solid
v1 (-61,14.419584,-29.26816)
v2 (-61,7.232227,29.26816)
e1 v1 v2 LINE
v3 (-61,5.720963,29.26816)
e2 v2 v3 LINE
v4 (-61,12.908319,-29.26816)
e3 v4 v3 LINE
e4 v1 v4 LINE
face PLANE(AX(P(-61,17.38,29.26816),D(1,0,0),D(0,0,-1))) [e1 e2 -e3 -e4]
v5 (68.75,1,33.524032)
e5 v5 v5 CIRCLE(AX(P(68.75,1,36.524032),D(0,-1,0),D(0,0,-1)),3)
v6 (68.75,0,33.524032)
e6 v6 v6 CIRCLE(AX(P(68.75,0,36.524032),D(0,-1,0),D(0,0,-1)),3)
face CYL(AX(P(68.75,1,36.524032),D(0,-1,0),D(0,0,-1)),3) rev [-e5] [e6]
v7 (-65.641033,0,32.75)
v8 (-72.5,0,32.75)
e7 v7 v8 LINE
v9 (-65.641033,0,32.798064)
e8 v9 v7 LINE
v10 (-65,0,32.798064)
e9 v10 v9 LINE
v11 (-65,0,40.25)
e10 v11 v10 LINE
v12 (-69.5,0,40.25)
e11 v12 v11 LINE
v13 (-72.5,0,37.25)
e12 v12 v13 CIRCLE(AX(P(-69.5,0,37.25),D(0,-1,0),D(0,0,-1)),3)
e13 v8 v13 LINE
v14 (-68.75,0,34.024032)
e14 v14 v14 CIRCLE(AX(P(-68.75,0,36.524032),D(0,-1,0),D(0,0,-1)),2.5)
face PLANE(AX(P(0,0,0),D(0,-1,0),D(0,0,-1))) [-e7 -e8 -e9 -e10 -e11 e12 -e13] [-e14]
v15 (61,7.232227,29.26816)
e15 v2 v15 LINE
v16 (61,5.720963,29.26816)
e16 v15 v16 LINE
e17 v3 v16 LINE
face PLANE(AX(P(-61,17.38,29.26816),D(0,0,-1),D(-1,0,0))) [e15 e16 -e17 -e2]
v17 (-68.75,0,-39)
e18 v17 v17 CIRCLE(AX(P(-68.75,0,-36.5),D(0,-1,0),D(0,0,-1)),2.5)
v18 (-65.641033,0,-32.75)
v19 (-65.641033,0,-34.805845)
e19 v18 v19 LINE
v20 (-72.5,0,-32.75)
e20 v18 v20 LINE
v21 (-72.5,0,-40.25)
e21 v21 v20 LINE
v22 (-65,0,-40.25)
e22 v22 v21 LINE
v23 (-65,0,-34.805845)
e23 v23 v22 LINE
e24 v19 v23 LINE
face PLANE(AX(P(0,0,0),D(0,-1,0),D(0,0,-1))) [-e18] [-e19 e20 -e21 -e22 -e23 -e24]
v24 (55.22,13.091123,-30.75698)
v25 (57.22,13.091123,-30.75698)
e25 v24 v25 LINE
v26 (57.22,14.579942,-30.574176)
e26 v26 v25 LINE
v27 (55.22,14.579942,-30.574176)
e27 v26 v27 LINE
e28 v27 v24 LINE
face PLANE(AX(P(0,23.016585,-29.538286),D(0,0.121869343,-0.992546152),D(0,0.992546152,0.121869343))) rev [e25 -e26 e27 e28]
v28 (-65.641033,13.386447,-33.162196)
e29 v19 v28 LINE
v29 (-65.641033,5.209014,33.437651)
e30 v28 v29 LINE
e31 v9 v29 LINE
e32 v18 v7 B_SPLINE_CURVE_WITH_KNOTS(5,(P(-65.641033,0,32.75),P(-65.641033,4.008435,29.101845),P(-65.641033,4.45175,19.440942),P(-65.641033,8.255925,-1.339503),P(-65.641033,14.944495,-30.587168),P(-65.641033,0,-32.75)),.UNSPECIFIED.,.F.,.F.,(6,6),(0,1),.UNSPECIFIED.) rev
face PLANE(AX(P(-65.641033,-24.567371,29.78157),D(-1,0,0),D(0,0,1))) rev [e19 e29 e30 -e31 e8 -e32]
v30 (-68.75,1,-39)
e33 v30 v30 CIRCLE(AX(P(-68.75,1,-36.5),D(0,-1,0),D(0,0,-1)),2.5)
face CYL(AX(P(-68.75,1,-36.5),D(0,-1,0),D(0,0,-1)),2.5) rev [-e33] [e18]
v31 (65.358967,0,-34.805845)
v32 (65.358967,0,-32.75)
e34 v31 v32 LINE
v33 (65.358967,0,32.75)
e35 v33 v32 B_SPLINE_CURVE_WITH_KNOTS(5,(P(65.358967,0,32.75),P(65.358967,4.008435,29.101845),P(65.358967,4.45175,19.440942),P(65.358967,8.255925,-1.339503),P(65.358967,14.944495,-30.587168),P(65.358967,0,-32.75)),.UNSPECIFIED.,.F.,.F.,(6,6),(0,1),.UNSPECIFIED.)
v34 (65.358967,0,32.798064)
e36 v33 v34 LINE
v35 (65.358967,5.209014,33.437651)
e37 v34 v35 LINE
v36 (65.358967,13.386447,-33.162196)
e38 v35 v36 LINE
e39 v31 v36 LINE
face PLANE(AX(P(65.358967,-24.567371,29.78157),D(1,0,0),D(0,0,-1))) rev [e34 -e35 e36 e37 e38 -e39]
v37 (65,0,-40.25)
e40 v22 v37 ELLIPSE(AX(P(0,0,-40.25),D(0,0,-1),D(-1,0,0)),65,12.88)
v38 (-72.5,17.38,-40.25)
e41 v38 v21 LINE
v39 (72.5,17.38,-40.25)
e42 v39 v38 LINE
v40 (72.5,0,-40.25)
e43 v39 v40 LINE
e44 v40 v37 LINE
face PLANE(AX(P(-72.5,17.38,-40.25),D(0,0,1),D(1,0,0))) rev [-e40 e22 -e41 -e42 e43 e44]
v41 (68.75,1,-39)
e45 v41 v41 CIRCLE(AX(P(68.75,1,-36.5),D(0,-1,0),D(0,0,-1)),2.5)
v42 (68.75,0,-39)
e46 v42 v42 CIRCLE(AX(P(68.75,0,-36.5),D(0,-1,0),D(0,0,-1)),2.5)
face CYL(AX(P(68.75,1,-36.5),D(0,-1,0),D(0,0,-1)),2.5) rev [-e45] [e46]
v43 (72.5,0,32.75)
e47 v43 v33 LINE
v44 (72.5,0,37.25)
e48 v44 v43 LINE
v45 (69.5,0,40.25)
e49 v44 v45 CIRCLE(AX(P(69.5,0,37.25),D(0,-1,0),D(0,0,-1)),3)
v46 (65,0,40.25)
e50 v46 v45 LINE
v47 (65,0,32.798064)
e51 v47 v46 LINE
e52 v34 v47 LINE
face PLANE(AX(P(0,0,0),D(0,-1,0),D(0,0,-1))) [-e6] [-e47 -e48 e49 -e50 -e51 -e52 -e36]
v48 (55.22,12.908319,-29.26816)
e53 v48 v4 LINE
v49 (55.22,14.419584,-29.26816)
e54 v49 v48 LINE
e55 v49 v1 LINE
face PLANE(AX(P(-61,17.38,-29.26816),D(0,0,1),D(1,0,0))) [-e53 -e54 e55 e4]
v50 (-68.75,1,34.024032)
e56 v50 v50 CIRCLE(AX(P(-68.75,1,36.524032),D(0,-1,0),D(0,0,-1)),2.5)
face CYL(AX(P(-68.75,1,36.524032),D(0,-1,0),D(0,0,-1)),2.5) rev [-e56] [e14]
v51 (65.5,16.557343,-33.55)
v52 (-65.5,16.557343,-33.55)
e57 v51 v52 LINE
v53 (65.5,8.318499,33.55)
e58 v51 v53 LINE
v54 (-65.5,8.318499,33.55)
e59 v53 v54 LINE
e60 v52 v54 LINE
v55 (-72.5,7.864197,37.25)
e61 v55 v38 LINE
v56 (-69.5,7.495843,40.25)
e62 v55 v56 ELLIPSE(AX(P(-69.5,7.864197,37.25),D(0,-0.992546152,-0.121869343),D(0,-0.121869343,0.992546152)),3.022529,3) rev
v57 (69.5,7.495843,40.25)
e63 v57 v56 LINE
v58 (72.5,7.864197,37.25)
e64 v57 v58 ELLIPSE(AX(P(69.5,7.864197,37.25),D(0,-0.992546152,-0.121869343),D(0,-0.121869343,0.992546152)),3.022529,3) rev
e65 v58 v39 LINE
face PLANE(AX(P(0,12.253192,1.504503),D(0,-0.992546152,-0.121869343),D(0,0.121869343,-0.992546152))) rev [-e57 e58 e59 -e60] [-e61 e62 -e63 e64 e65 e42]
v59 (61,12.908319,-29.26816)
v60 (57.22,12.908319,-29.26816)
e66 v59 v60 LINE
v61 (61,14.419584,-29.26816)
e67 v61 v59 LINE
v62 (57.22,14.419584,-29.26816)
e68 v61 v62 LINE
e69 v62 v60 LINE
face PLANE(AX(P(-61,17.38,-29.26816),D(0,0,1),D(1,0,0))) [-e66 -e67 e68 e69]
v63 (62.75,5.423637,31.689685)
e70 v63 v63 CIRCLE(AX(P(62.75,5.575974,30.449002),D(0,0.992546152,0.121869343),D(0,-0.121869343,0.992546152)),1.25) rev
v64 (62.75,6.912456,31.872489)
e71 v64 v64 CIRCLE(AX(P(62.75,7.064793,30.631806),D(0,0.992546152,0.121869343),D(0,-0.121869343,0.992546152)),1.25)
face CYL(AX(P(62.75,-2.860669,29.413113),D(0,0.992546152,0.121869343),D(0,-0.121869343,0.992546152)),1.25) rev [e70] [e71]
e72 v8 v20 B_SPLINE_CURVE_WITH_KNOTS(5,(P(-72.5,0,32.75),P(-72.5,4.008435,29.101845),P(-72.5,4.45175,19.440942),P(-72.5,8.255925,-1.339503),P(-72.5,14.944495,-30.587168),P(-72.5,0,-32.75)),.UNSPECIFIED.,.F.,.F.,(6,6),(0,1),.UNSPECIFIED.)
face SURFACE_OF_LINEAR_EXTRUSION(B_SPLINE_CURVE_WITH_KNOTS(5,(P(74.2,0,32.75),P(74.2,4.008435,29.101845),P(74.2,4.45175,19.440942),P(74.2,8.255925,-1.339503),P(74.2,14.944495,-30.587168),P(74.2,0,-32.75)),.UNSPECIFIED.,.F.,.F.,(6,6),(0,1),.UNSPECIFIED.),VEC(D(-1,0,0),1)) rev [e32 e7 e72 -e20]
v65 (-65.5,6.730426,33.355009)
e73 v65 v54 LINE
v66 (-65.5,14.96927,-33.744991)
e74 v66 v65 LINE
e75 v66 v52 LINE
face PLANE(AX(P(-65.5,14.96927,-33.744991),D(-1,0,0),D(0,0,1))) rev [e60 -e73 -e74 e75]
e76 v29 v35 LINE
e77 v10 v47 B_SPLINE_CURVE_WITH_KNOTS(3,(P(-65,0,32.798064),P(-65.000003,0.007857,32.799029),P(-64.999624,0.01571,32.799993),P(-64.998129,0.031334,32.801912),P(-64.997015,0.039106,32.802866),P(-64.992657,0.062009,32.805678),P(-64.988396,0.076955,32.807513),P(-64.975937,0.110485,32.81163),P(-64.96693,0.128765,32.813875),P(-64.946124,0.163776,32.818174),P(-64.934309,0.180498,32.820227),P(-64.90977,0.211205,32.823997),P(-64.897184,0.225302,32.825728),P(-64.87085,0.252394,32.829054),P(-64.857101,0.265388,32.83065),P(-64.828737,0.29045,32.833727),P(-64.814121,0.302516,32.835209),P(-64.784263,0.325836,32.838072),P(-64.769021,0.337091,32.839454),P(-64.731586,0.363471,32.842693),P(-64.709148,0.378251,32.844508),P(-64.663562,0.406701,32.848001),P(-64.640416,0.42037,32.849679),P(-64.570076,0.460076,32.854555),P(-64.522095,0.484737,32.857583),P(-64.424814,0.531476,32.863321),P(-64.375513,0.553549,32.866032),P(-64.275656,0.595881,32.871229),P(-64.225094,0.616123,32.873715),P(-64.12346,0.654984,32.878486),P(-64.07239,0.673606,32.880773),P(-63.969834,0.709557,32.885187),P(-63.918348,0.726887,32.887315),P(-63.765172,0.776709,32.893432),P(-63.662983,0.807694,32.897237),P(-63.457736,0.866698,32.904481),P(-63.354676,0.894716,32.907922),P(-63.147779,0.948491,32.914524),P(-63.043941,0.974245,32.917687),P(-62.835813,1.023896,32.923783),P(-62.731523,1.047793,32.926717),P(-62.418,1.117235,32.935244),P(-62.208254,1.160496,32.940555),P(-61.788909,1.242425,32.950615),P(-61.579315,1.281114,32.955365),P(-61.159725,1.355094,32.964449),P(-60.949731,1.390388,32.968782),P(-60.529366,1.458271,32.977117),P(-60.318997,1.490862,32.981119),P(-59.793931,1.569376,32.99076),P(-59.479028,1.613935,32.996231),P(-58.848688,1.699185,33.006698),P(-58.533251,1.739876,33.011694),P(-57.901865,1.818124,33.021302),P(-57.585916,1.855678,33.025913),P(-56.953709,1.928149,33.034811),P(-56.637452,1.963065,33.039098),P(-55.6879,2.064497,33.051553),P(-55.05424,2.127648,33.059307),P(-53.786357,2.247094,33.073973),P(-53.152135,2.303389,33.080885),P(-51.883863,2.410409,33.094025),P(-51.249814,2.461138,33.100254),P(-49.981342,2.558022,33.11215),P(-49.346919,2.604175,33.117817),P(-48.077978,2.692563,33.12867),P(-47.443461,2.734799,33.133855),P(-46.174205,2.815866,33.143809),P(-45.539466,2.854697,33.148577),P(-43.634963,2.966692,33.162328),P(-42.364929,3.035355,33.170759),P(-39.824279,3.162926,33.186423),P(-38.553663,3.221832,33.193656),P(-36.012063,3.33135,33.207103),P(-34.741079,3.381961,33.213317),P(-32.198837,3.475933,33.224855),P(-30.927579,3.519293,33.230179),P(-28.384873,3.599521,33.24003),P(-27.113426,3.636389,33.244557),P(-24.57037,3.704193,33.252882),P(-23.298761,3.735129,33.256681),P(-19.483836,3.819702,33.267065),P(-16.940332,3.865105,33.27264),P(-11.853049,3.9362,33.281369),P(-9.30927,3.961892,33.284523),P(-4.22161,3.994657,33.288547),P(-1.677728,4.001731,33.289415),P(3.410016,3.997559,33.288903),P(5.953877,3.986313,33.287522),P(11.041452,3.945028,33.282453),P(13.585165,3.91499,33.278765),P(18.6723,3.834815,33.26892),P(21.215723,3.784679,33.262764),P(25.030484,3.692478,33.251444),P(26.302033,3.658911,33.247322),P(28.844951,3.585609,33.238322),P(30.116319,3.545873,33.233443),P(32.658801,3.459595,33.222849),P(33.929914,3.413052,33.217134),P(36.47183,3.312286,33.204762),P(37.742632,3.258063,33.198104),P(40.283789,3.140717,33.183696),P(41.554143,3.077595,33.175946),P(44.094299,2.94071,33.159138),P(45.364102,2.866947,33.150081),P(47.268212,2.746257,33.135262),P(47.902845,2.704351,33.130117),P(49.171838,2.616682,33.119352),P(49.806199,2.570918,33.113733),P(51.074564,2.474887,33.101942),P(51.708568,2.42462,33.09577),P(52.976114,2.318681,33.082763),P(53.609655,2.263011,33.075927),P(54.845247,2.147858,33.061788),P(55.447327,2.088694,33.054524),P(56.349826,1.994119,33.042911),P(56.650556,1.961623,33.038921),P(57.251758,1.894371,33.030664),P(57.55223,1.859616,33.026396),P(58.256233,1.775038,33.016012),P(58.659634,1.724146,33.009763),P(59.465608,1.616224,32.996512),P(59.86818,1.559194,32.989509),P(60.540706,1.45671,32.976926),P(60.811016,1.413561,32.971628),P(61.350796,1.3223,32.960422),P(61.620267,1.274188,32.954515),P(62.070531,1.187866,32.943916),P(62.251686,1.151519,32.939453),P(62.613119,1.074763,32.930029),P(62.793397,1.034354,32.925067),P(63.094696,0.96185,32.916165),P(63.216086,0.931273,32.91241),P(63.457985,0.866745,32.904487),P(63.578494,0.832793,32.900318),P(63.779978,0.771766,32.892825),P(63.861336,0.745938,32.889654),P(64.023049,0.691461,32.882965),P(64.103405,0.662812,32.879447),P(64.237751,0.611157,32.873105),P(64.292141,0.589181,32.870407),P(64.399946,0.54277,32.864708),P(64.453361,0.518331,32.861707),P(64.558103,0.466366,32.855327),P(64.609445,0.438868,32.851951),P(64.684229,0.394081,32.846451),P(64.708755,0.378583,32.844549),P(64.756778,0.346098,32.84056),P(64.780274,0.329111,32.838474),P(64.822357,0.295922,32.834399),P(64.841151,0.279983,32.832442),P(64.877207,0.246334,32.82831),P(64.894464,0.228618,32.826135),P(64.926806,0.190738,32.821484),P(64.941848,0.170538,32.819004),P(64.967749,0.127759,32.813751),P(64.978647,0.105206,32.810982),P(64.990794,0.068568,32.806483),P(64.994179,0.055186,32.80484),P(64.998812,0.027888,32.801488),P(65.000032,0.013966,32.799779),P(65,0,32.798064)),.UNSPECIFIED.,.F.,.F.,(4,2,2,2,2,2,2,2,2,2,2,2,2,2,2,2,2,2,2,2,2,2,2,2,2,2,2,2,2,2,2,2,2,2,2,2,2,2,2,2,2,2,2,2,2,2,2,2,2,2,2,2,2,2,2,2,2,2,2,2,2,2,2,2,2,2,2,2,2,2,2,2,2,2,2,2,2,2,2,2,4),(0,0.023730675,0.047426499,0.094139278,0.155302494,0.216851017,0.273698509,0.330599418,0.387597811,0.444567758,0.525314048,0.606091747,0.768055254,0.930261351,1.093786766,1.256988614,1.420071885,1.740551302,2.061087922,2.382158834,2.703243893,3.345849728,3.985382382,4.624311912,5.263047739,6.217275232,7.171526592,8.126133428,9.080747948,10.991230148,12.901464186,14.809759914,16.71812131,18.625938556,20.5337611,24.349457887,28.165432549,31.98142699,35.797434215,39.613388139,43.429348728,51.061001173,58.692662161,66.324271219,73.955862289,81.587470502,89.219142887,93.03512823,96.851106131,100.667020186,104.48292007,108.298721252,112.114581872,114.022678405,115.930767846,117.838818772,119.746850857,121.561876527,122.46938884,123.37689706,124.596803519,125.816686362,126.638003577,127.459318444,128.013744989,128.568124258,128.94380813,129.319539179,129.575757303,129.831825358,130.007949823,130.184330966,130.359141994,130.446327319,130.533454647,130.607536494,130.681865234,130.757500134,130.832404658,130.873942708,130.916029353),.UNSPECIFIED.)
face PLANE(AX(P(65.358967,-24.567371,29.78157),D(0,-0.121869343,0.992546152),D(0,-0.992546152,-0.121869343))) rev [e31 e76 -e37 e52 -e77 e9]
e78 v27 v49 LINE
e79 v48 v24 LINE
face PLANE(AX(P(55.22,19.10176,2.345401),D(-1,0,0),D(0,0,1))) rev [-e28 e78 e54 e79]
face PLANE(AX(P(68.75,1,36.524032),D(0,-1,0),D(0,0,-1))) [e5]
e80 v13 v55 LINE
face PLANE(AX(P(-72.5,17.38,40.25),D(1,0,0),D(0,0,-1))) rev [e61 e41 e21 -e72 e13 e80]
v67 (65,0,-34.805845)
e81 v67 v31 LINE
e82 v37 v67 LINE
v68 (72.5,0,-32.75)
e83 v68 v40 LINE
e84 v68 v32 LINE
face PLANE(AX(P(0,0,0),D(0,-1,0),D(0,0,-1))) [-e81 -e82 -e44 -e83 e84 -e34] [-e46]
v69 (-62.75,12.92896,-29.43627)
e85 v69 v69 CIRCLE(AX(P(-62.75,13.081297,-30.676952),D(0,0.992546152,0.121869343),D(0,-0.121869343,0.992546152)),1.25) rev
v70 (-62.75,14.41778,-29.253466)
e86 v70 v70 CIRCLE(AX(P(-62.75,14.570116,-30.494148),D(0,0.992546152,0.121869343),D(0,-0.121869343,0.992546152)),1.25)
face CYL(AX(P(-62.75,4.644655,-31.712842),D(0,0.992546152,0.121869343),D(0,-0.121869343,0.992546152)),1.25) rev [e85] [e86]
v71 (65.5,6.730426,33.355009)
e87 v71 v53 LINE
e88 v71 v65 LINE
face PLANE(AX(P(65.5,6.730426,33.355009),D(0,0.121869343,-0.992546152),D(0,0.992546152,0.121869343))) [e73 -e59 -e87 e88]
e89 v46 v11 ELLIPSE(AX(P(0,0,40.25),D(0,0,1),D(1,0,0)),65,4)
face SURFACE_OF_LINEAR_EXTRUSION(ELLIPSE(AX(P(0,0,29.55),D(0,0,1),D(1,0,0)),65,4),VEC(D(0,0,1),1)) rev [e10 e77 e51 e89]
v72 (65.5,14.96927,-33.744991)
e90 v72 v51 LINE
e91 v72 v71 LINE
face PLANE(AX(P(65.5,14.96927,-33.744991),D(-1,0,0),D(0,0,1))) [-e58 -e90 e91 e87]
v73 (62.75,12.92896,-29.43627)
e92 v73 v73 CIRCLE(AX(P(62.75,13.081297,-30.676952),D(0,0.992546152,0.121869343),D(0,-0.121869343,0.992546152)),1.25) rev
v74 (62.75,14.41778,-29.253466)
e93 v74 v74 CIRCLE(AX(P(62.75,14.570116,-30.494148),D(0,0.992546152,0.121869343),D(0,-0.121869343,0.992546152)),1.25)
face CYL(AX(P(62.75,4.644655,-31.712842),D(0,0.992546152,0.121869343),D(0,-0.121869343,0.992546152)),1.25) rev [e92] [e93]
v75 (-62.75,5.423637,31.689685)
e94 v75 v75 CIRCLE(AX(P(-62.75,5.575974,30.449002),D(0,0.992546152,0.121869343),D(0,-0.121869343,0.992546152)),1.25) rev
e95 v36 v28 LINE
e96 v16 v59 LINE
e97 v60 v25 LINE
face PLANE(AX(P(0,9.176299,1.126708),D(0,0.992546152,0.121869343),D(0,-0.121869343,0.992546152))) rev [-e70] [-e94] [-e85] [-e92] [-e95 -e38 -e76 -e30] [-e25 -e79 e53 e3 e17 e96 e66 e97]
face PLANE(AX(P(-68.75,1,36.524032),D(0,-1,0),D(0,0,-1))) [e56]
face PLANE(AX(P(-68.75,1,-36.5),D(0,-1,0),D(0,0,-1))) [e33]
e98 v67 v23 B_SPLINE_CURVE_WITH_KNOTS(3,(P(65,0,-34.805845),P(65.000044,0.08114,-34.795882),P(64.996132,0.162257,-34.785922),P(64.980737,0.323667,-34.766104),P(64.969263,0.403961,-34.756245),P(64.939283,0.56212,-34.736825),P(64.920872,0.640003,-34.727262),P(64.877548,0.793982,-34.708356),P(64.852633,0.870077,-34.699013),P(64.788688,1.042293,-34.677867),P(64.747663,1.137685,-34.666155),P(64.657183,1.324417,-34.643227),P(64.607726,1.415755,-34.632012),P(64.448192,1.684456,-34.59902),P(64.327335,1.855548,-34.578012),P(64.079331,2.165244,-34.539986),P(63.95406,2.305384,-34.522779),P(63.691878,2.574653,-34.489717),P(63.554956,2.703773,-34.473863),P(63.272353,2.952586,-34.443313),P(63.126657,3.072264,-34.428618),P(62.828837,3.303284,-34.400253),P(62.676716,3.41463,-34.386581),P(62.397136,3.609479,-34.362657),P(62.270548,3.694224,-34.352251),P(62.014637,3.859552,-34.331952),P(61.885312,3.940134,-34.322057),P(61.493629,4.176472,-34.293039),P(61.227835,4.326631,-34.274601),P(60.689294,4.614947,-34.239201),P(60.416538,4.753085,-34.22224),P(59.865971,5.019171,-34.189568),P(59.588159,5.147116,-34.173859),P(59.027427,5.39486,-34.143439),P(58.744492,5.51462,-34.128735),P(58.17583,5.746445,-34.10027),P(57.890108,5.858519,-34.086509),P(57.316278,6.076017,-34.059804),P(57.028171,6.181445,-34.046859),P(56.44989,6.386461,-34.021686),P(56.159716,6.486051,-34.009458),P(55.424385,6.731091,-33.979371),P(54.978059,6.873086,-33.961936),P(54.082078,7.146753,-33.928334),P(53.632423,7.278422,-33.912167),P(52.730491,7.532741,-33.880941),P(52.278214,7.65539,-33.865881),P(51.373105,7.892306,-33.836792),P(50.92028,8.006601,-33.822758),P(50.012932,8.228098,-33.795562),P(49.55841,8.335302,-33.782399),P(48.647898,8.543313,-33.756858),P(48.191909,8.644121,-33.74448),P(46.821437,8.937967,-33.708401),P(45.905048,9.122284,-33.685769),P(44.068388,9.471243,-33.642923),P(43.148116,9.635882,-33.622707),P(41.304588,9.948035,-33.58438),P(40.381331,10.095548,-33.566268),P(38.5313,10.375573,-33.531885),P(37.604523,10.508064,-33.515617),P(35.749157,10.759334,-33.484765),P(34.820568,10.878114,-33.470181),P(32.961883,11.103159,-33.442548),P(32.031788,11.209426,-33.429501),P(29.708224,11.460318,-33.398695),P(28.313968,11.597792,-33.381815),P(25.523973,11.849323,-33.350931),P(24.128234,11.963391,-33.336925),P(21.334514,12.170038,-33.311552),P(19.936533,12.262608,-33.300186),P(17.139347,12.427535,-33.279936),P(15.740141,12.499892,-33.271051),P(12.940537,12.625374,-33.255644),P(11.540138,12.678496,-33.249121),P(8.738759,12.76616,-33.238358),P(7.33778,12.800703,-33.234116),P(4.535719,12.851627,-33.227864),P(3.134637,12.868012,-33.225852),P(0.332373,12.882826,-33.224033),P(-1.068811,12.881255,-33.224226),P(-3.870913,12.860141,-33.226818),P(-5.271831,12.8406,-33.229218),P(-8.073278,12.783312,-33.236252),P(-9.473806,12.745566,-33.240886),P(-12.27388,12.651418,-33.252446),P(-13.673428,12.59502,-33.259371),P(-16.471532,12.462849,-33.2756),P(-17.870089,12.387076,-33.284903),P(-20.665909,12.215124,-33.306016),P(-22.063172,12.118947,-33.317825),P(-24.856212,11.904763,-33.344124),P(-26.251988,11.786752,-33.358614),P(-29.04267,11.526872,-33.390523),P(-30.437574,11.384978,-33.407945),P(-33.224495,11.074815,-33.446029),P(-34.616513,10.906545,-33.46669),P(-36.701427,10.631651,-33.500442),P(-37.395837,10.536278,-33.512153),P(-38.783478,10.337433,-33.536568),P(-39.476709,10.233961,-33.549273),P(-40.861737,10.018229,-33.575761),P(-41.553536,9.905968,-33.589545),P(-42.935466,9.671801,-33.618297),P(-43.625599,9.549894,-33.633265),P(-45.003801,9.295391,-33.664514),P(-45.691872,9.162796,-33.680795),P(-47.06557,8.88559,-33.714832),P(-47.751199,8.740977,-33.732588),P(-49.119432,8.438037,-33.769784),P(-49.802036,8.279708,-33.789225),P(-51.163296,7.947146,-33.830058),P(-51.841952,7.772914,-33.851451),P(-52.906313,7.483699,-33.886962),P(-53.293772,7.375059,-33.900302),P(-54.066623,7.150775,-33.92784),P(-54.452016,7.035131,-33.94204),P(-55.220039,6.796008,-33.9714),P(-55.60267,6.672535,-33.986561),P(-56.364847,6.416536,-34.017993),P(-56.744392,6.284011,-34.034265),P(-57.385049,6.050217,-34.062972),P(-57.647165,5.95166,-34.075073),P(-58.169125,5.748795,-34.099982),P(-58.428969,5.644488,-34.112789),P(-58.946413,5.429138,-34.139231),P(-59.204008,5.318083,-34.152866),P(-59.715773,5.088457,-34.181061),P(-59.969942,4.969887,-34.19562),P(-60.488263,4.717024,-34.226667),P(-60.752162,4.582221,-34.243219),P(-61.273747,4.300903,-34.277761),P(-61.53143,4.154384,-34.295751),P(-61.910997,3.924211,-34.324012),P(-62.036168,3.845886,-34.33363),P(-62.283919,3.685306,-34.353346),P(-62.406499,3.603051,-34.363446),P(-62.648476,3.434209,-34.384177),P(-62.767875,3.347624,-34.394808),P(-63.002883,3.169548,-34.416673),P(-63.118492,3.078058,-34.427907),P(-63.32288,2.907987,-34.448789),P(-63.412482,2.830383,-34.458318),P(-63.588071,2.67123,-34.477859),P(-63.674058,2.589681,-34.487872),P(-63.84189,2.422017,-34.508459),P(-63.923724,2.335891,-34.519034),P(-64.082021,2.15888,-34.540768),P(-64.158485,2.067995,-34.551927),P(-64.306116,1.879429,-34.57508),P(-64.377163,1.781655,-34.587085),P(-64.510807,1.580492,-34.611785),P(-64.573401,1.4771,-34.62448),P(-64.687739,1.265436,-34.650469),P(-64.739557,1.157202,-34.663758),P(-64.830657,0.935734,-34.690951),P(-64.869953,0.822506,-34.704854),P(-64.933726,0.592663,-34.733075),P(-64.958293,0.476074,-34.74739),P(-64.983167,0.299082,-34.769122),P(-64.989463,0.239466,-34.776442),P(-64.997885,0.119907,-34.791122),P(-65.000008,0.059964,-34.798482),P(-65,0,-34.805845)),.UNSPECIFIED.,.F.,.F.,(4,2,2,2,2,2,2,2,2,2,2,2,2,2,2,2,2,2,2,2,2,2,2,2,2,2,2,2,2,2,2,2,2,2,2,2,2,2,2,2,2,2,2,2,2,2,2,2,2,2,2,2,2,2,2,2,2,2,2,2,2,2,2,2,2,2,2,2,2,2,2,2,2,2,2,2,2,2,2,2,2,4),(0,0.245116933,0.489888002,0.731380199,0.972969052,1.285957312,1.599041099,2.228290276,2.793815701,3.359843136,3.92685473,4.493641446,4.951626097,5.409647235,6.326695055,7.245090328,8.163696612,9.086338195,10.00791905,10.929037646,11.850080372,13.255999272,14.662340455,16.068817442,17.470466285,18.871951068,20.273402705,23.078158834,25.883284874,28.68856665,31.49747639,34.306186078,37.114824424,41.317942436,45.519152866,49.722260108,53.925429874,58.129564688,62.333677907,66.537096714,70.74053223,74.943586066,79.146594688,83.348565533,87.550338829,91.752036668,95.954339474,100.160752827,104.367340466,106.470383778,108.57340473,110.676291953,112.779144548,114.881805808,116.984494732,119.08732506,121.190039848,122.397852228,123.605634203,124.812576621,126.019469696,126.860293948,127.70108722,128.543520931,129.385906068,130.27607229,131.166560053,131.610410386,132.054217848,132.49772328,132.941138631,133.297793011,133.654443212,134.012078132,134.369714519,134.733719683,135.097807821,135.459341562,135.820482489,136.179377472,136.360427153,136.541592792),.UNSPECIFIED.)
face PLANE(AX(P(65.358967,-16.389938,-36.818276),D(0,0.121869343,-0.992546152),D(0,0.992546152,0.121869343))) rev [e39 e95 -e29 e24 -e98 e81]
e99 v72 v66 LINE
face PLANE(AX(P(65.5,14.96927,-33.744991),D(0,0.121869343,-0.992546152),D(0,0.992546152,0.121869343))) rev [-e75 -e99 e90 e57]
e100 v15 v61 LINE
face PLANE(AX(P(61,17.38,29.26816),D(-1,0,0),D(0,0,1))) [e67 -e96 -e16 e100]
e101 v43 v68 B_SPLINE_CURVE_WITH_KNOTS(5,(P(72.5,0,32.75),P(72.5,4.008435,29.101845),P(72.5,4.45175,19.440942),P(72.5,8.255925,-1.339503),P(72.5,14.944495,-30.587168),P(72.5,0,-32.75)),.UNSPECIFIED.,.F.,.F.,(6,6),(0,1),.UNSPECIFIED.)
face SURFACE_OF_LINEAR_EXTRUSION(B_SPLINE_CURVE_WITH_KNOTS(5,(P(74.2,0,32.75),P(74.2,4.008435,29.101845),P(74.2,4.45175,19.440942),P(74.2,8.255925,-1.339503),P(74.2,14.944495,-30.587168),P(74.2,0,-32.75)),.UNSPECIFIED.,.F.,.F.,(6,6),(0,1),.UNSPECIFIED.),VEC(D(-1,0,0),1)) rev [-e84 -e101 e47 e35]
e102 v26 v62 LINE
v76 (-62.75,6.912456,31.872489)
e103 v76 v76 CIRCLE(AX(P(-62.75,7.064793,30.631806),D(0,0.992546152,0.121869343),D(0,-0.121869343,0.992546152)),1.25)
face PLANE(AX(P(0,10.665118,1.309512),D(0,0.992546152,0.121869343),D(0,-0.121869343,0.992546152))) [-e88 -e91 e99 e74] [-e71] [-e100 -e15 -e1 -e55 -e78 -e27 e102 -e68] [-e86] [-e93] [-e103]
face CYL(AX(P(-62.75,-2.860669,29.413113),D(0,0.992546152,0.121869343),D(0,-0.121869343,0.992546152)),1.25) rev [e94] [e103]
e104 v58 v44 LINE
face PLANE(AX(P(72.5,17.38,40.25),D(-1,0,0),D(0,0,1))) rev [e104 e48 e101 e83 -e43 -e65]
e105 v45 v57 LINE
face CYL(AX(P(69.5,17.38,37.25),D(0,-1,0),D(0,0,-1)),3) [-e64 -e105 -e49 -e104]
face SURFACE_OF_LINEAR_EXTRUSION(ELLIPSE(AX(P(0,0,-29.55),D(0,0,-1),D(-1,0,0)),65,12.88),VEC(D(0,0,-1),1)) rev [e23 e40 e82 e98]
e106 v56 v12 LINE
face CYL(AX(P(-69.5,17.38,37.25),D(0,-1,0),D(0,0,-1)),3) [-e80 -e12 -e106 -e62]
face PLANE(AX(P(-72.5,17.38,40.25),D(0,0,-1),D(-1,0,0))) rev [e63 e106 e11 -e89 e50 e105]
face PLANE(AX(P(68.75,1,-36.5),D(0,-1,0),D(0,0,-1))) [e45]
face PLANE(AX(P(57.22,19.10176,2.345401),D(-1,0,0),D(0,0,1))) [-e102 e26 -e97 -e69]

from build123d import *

# Parameters (mm, degrees)
SKETCH1_W            = 145
SKETCH1_H            = 80.5
SKETCH1_W_2          = 131
SKETCH1_H_2          = 67.1
BOSS_EXTRUDE1_DEPTH  = 17.38
SKETCH2_W            = 145.621836594
SKETCH2_H            = 81.229894902
CUT_EXTRUDE1_DEPTH   = 10.38
FILLET1_R            = 3
SKETCH5_W            = 131
SKETCH5_H            = 67.1
SKETCH5_W_2          = 122
SKETCH5_H_2          = 58.53632086
BOSS_EXTRUDE17_DEPTH = 17.38
SKETCH9_W            = 144.471640976
SKETCH9_H            = 84.136143584
CUT_EXTRUDE5_DEPTH   = 9.6
SKETCH6_W            = 131
SKETCH6_H            = 67.603909288
CUT_EXTRUDE6_DEPTH   = 1.6
SKETCH10_RX          = 65
SKETCH10_RY          = 4
CUT_EXTRUDE8_DEPTH   = 10.7
SKETCH12_RX          = 65
SKETCH12_RY          = 12.88
CUT_EXTRUDE9_DEPTH   = 10.7
CUT_EXTRUDE12_START  = -145
CUT_EXTRUDE12_DEPTH  = 145
CUT_EXTRUDE13_DEPTH  = 10
SKETCH21_W           = 131
SKETCH21_H           = 67.1
CUT_EXTRUDE14_DEPTH  = 30
SKETCH23_R           = 2.5
SKETCH23_R_2         = 3
CUT_EXTRUDE15_DEPTH  = 1
CUT_EXTRUDE17_DEPTH  = 10


# Read off the part's stored shape, not the designer's step: Cut-Extrude12
with BuildPart() as part:
    # Sketch1 → Boss-Extrude1 (new body)
    with BuildSketch(Plane(origin=(0, 0, 0), x_dir=(1, 0, 0), z_dir=(0, 1, 0))):
        Rectangle(SKETCH1_W, SKETCH1_H)
        Rectangle(SKETCH1_W_2, SKETCH1_H_2, mode=Mode.SUBTRACT)
    extrude(amount=BOSS_EXTRUDE1_DEPTH)

    # Sketch2 → Cut-Extrude1 (cut)
    with BuildSketch(Plane(origin=(0, 12.253191712, 1.504502764), x_dir=(-1, 0, 0), z_dir=(0, 0.9925461516413239, 0.12186934340513403))):
        with Locations((0.310918297, -1.453124341)):
            Rectangle(SKETCH2_W, SKETCH2_H)
    extrude(amount=CUT_EXTRUDE1_DEPTH, mode=Mode.SUBTRACT)

    # Fillet1
    fillet1_edges = [part.edges().sort_by_distance(p)[0] for p in [
        (72.5, 3.747921424, 40.25),
        (-72.5, 3.747921424, 40.25),
    ]]
    fillet(fillet1_edges, radius=FILLET1_R)

    # Sketch5 → Boss-Extrude17 (add)
    with BuildSketch(Plane(origin=(0, 0, 0), x_dir=(1, 0, 0), z_dir=(0, 1, 0))):
        Rectangle(SKETCH5_W, SKETCH5_H)
        Rectangle(SKETCH5_W_2, SKETCH5_H_2, mode=Mode.SUBTRACT)
    extrude(amount=BOSS_EXTRUDE17_DEPTH)

    # Sketch9 → Cut-Extrude5 (cut)
    with BuildSketch(Plane(origin=(0, 12.253191712, 1.504502764), x_dir=(1, 0, 0), z_dir=(0, 0.9925461516413236, 0.12186934340513404))):
        Rectangle(SKETCH9_W, SKETCH9_H)
    extrude(amount=CUT_EXTRUDE5_DEPTH, mode=Mode.SUBTRACT)

    # Sketch6 → Cut-Extrude6 (cut)
    with BuildSketch(Plane(origin=(0, 12.253191712, 1.504502764), x_dir=(-1, 0, 0), z_dir=(0, 0.9925461516413239, 0.12186934340513403))):
        with Locations((0, -1.515801317)):
            Rectangle(SKETCH6_W, SKETCH6_H)
    extrude(amount=-CUT_EXTRUDE6_DEPTH, mode=Mode.SUBTRACT)

    # Sketch10 → Cut-Extrude8 (cut)
    with BuildSketch(Plane.XY.offset(40.25)):
        with Locations((0, 0)):
            Ellipse(SKETCH10_RX, SKETCH10_RY)
    extrude(amount=-CUT_EXTRUDE8_DEPTH, mode=Mode.SUBTRACT)

    # Sketch12 → Cut-Extrude9 (cut)
    with BuildSketch(Plane(origin=(0, 0, -40.25), x_dir=(-1, 0, 0), z_dir=(0, 0, -1))):
        with Locations((0, 0)):
            Ellipse(SKETCH12_RX, SKETCH12_RY)
    extrude(amount=-CUT_EXTRUDE9_DEPTH, mode=Mode.SUBTRACT)

    # Cut-Extrude12 outline → Cut-Extrude12 (cut)
    with BuildSketch(Plane.ZY.offset(72.5).offset(CUT_EXTRUDE12_START)):
        with BuildLine():
            add(Edge.make_bspline(
                [(32.75, 0), (29.101844556, 4.008435343), (19.440941834, 4.451750453), (-1.339502668, 8.255924616), (-30.587167794, 14.944494998), (-32.75, 0)],
                knots=[0, 0, 0, 0, 0, 0, 1, 1, 1, 1, 1, 1], degree=5))
            Line((-32.75, 0), (32.75, 0))
        make_face()
    extrude(amount=CUT_EXTRUDE12_DEPTH, mode=Mode.SUBTRACT)

    # Sketch19 → Cut-Extrude13 (cut)
    with BuildSketch(Plane(origin=(0, 10.66511787, 1.309511815), x_dir=(1, 0, 0), z_dir=(0, 0.9925461516413238, 0.12186934340513403))):
        with BuildLine():
            ThreePointArc((61.5, 32.0425), (61.866116524, 31.158616524), (62.75, 30.7925))
            Line((62.75, 30.7925), (62.75, 32.0425))
            Line((62.75, 32.0425), (61.5, 32.0425))
        make_face()
        with BuildLine():
            Line((62.75, 32.0425), (62.75, 30.7925))
            ThreePointArc((62.75, 30.7925), (63.633883476, 31.158616524), (64, 32.0425))
            ThreePointArc((64, 32.0425), (62.75, 33.2925), (61.5, 32.0425))
            Line((61.5, 32.0425), (62.75, 32.0425))
        make_face()
        with BuildLine():
            ThreePointArc((64, -29.5425), (63.633883476, -28.658616524), (62.75, -28.2925))
            Line((62.75, -28.2925), (62.75, -29.5425))
            Line((62.75, -29.5425), (61.5, -29.5425))
            ThreePointArc((61.5, -29.5425), (62.75, -30.7925), (64, -29.5425))
        make_face()
        with BuildLine():
            Line((62.75, -29.5425), (62.75, -28.2925))
            ThreePointArc((62.75, -28.2925), (61.866116524, -28.658616524), (61.5, -29.5425))
            Line((61.5, -29.5425), (62.75, -29.5425))
        make_face()
        with BuildLine():
            ThreePointArc((-61.5, -29.5425), (-61.866116524, -28.658616524), (-62.75, -28.2925))
            Line((-62.75, -28.2925), (-62.75, -29.5425))
            Line((-62.75, -29.5425), (-61.5, -29.5425))
        make_face()
        with BuildLine():
            Line((-62.75, -29.5425), (-62.75, -28.2925))
            ThreePointArc((-62.75, -28.2925), (-63.633883476, -30.426383476), (-61.5, -29.5425))
            Line((-61.5, -29.5425), (-62.75, -29.5425))
        make_face()
        with BuildLine():
            ThreePointArc((-61.5, 32.0425), (-63.633883476, 32.926383476), (-62.75, 30.7925))
            Line((-62.75, 30.7925), (-62.75, 32.0425))
            Line((-62.75, 32.0425), (-61.5, 32.0425))
        make_face()
        with BuildLine():
            Line((-62.75, 32.0425), (-62.75, 30.7925))
            ThreePointArc((-62.75, 30.7925), (-61.866116524, 31.158616524), (-61.5, 32.0425))
            Line((-61.5, 32.0425), (-62.75, 32.0425))
        make_face()
    extrude(amount=-CUT_EXTRUDE13_DEPTH, mode=Mode.SUBTRACT)

    # Sketch21 → Cut-Extrude14 (cut)
    with BuildSketch(Plane(origin=(0, 9.176298642, 1.1267078), x_dir=(1, 0, 0), z_dir=(0, 0.9925461516413236, 0.12186934340513401))):
        with Locations((-0.141032576, 0.996407471)):
            Rectangle(SKETCH21_W, SKETCH21_H)
    extrude(amount=-CUT_EXTRUDE14_DEPTH, mode=Mode.SUBTRACT)

    # Sketch23 → Cut-Extrude15 (cut)
    with BuildSketch(Plane(origin=(0, 0, 0), x_dir=(-1, 0, 0), z_dir=(0, -1, 0))):
        with Locations(Location((-68.75, 36.5, 0), (0, 0, 90))):
            Circle(SKETCH23_R)
        with Locations(Location((-68.75, -36.524032163, 0), (0, 0, 90))):
            Circle(SKETCH23_R_2)
        with Locations(Location((68.75, -36.524032163, 0), (0, 0, 90))):
            Circle(SKETCH23_R)
        with Locations(Location((68.75, 36.5, 0), (0, 0, 90))):
            Circle(SKETCH23_R)
    extrude(amount=-CUT_EXTRUDE15_DEPTH, mode=Mode.SUBTRACT)

    # Sketch25 → Cut-Extrude17 (cut)
    with BuildSketch(Plane(origin=(0, 9.176298642, 1.1267078), x_dir=(1, 0, 0), z_dir=(0, -0.9925461516413238, -0.1218693434051341))):
        Polygon((57.22, -32.123128384), (57.22, -32.0425), (57.22, -30.623128384), (55.22, -30.623128384), (55.22, -32.123128384), align=None)
    extrude(amount=-CUT_EXTRUDE17_DEPTH, mode=Mode.SUBTRACT)


solid = part.part
